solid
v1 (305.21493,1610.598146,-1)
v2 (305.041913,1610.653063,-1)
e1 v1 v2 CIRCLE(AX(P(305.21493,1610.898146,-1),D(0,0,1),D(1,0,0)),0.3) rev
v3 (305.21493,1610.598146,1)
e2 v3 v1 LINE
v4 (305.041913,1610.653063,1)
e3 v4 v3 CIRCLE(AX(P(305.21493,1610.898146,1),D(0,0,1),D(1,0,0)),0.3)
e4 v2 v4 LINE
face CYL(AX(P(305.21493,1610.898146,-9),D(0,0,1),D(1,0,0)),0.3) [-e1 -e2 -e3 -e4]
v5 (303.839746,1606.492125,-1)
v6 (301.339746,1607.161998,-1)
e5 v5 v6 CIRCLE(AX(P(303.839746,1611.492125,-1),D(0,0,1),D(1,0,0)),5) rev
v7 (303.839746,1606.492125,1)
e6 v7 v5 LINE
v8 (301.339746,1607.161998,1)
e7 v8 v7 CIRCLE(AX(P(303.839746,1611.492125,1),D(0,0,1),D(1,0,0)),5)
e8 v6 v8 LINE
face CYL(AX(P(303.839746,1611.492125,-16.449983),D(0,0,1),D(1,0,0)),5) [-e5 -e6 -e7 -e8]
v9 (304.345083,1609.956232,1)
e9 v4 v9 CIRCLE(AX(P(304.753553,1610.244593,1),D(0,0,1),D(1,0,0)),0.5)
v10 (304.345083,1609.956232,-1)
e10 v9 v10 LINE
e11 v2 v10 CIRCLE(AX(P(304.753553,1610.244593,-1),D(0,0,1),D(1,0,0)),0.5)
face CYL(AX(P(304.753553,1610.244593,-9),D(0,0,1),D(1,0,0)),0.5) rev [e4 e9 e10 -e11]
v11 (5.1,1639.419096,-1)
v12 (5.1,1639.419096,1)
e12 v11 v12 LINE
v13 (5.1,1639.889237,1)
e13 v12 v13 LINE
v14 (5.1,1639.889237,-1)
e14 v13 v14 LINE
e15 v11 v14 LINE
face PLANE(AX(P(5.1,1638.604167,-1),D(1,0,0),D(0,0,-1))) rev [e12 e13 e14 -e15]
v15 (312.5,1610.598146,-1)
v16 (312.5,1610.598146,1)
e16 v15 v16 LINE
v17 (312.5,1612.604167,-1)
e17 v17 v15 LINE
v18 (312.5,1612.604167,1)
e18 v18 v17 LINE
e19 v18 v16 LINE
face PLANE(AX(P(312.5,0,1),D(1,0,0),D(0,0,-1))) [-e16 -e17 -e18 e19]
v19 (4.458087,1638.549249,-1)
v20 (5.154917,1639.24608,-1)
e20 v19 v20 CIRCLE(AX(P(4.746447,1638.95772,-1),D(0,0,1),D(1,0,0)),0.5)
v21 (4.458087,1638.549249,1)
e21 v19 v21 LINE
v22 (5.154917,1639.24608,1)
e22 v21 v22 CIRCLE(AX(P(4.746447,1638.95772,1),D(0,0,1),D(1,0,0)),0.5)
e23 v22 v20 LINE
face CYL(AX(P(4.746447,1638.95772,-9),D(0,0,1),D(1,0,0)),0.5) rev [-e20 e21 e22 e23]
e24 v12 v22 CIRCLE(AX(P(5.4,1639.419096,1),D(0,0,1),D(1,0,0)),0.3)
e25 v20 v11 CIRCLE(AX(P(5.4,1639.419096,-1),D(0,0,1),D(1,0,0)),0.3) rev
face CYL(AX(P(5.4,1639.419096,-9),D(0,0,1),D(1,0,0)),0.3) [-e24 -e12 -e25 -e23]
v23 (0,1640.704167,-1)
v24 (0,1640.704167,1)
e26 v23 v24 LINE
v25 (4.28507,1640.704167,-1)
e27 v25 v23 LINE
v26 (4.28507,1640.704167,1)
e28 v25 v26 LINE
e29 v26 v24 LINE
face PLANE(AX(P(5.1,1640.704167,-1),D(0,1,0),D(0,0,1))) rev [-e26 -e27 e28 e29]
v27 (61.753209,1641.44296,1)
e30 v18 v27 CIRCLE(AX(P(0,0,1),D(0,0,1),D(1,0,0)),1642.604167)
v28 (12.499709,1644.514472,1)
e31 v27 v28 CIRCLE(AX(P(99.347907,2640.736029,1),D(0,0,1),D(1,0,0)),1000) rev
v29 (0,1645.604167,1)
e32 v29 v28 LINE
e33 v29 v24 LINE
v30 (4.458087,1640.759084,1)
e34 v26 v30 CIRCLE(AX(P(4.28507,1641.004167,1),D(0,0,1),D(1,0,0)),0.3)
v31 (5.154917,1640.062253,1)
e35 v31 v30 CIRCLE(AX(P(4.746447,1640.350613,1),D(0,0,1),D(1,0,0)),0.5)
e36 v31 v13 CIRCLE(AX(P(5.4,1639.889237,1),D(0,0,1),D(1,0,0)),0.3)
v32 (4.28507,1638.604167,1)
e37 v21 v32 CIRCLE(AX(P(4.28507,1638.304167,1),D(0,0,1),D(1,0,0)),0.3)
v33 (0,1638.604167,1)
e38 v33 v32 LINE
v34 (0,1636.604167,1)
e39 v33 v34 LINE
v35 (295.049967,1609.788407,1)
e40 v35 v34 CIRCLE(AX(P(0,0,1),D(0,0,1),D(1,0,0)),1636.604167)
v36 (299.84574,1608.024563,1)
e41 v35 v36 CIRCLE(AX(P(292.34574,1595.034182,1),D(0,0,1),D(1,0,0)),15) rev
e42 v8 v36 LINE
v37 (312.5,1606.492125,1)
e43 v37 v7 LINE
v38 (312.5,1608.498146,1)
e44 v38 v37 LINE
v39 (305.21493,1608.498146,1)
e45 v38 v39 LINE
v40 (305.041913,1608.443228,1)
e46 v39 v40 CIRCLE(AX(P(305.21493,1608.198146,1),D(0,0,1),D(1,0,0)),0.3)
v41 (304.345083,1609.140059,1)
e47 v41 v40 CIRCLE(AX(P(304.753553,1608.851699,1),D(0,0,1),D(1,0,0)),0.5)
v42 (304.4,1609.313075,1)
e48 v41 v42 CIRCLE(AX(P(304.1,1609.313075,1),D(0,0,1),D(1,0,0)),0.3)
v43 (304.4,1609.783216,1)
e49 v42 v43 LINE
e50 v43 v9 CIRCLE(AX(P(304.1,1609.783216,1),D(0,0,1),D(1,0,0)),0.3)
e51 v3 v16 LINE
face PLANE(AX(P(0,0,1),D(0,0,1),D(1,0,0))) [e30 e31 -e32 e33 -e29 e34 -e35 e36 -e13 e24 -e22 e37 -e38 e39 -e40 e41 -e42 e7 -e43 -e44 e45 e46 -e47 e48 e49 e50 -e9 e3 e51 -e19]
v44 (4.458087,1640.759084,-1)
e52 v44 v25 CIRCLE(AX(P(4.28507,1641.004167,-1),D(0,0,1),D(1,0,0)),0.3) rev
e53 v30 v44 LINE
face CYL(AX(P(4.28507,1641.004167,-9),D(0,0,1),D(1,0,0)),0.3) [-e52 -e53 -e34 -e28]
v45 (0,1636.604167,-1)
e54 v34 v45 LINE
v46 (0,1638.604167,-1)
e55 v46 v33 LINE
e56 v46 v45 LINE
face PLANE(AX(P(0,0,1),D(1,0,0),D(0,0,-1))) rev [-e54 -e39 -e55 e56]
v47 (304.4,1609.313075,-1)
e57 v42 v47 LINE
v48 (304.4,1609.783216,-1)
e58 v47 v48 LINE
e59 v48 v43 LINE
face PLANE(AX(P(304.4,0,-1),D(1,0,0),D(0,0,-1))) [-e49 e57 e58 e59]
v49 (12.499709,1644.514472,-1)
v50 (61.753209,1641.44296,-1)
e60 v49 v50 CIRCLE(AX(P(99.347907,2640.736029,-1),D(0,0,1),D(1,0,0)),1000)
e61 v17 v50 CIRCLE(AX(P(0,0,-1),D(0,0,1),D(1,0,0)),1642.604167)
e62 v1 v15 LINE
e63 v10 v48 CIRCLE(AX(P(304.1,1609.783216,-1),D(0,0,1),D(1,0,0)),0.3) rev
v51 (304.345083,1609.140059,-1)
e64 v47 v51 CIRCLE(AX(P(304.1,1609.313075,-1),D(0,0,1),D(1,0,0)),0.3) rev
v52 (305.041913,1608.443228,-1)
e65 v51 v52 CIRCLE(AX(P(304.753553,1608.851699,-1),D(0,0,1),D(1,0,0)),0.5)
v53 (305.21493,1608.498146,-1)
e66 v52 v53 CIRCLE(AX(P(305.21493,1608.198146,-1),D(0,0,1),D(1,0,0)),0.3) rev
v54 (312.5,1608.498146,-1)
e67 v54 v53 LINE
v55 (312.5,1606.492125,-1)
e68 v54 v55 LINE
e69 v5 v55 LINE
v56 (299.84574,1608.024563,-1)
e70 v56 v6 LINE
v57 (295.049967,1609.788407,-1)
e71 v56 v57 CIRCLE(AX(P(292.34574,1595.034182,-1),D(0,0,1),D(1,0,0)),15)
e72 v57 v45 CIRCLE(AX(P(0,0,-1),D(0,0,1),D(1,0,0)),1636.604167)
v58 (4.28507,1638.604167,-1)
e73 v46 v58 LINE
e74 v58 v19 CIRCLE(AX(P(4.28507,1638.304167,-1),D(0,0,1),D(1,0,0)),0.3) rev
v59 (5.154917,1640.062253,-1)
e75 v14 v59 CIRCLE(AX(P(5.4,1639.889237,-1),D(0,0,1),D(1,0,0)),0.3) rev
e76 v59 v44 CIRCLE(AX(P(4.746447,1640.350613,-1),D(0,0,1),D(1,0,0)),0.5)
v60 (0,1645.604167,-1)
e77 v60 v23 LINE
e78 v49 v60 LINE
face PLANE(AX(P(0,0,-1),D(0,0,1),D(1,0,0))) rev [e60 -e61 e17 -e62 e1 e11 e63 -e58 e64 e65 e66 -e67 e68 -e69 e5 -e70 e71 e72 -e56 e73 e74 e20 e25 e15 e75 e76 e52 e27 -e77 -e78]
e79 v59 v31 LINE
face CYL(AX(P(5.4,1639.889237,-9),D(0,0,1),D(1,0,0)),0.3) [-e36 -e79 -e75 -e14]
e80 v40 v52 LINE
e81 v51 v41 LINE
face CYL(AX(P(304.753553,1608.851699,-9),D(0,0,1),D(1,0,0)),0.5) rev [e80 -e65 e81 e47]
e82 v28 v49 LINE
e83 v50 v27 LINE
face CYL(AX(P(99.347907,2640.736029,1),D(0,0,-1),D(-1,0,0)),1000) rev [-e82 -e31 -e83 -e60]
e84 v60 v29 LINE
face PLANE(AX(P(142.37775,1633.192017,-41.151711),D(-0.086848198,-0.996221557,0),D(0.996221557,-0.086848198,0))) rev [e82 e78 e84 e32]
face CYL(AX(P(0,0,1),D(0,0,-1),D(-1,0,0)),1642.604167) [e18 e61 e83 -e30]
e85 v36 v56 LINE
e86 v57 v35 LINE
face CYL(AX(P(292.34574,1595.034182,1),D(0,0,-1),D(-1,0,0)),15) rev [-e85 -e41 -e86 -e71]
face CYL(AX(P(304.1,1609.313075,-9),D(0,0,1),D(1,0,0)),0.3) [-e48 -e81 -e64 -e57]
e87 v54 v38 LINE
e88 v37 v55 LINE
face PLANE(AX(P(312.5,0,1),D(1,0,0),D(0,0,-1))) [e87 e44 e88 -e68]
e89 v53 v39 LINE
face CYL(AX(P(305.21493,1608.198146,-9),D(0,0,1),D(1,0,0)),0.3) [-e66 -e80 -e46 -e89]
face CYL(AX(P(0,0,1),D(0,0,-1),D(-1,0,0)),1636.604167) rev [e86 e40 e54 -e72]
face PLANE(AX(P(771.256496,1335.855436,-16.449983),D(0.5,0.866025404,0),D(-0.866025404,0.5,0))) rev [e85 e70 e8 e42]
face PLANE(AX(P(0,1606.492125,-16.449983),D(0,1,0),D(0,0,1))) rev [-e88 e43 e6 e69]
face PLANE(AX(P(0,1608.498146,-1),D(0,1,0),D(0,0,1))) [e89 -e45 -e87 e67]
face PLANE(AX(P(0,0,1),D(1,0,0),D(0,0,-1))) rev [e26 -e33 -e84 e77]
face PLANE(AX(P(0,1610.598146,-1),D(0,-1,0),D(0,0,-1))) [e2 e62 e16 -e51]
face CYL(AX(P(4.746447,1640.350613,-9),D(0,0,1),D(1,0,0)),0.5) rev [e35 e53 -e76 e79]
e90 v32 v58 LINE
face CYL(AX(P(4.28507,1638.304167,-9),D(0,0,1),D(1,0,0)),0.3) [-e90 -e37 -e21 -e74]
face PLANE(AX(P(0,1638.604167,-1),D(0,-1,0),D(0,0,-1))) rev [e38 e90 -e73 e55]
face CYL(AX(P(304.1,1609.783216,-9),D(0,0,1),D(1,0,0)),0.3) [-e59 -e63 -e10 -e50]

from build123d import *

# Parameters (mm, degrees)
EXTRUDE_1_DEPTH     = 1
EXTRUDE_2_DEPTH     = 2
SKETCH_2_3_W        = 8.1
SKETCH_2_3_H        = 1.05
CUT_EXTRUDE_1_DEPTH = 1673.067193133
EXTRUDE_3_DEPTH     = 2
FILLET_1_R          = 1000
SKETCH_4_W          = 5.1
SKETCH_4_H          = 2.1
CUT_EXTRUDE_2_DEPTH = 1676.014424819
CUT_EXTRUDE_3_DEPTH = 10
FILLET_2_R          = 0.3
FILLET_3_R          = 15
FILLET_4_R          = 5


with BuildPart() as part:
    # 草图1 → 凸台-拉伸1 (new, symmetric)
    with BuildSketch(Plane.XY):
        with BuildLine():
            Line((279.250783347, 1612.604166667), (312.5, 1612.604166667))
            ThreePointArc((312.5, 1612.604166667), (156.96834872, 1635.086965837), (0, 1642.604166667))
            Line((0, 1642.604166667), (0, 1636.604166667))
            ThreePointArc((0, 1636.604166667), (140.140108463, 1630.593127776), (279.250783347, 1612.604166667))
        make_face()
        with BuildLine():
            ThreePointArc((279.250783347, 1612.604166667), (295.891173678, 1609.633999296), (312.5, 1606.492125207))
            Line((312.5, 1606.492125207), (312.5, 1612.604166667))
            Line((312.5, 1612.604166667), (279.250783347, 1612.604166667))
        make_face()
    extrude(amount=EXTRUDE_1_DEPTH, both=True)

    # 草图2 → 凸台-拉伸2 (add)
    with BuildSketch(Plane.XY.offset(1)):
        with BuildLine():
            Line((304.4, 1608.498145937), (304.4, 1609.548145937))
            Line((304.4, 1609.548145937), (304.4, 1610.598145937))
            Line((304.4, 1610.598145937), (297.605619779, 1609.317896945))
            ThreePointArc((297.605619779, 1609.317896945), (305.056081841, 1607.922257226), (312.5, 1606.492125207))
            Line((312.5, 1606.492125207), (312.5, 1608.498145937))
            Line((312.5, 1608.498145937), (304.4, 1608.498145937))
        make_face()
        with BuildLine():
            Line((302.5, 1606.492125207), (312.5, 1606.492125207))
            ThreePointArc((312.5, 1606.492125207), (305.056081841, 1607.922257226), (297.605619779, 1609.317896945))
            Line((297.605619779, 1609.317896945), (302.5, 1606.492125207))
        make_face()
    extrude(amount=-EXTRUDE_2_DEPTH)

    # 草图2<3> → 切除-拉伸1 (cut, through all)
    with BuildSketch(Plane.XY.offset(1)):
        with Locations((308.45, 1610.073145937)):
            Rectangle(SKETCH_2_3_W, SKETCH_2_3_H)
        with Locations((308.45, 1609.023145937)):
            Rectangle(SKETCH_2_3_W, SKETCH_2_3_H)
    extrude(amount=-CUT_EXTRUDE_1_DEPTH, mode=Mode.SUBTRACT)

    # 草图3 → 凸台-拉伸3 (add)
    with BuildSketch(Plane.XY.offset(1)):
        with BuildLine():
            Line((0, 1645.604166667), (0, 1642.604166667))
            ThreePointArc((0, 1642.604166667), (20.001482883, 1642.482386217), (40, 1642.117062925))
            Line((40, 1642.117062925), (0, 1645.604166667))
        make_face()
    extrude(amount=-EXTRUDE_3_DEPTH)

    # 圆角1
    # the kernel refuses this fillet: 1000 mm, written as the material it adds along each edge
    with BuildSketch(Plane(origin=(40, 1642.117062925, 1), x_dir=(-0.9962215569396788, 0.08684819795874989, 0), z_dir=(0, 0, -1))) as fillet_1_piece_1:
        with BuildLine():
            CenterArc((27.604593051, 1000), FILLET_1_R, 267.172213378, 2.827786622)
            ThreePointArc((-21.729560043, 1.217670692), (-10.862763311, 0.644823912), (0, 0))
            Line((0, 0), (27.604593051, 0))
        make_face()
    extrude(amount=2)

    # 草图4 → 切除-拉伸2 (cut, through all)
    with BuildSketch(Plane.XY.offset(1)):
        with Locations((2.55, 1639.654166667)):
            Rectangle(SKETCH_4_W, SKETCH_4_H)
    extrude(amount=-CUT_EXTRUDE_2_DEPTH, mode=Mode.SUBTRACT)

    # 草图5 → 切除-拉伸3 (cut)
    with BuildSketch(Plane.XY.offset(1)):
        with BuildLine():
            Line((304.4, 1608.498145937), (304.4, 1609.205252718))
            ThreePointArc((304.4, 1609.205252718), (304.253553391, 1608.851699327), (304.4, 1608.498145937))
        make_face()
        with BuildLine():
            Line((305.107106781, 1608.498145937), (304.4, 1608.498145937))
            ThreePointArc((304.4, 1608.498145937), (304.753553391, 1608.351699327), (305.107106781, 1608.498145937))
        make_face()
        with BuildLine():
            ThreePointArc((304.4, 1610.598145937), (304.253553391, 1610.244592546), (304.4, 1609.891039155))
            Line((304.4, 1609.891039155), (304.4, 1610.598145937))
        make_face()
        with BuildLine():
            Line((304.4, 1610.598145937), (305.107106781, 1610.598145937))
            ThreePointArc((305.107106781, 1610.598145937), (304.753553391, 1610.744592546), (304.4, 1610.598145937))
        make_face()
        with BuildLine():
            ThreePointArc((5.1, 1639.997059885), (5.208386376, 1640.15927156), (5.246446609, 1640.350613276))
            ThreePointArc((5.246446609, 1640.350613276), (5.208386376, 1640.541954992), (5.1, 1640.704166667))
            Line((5.1, 1640.704166667), (5.1, 1639.997059885))
        make_face()
        with BuildLine():
            Line((4.392893219, 1640.704166667), (5.1, 1640.704166667))
            ThreePointArc((5.1, 1640.704166667), (4.746446609, 1640.850613276), (4.392893219, 1640.704166667))
        make_face()
        with BuildLine():
            ThreePointArc((5.246446609, 1638.957720057), (5.208386376, 1639.149061773), (5.1, 1639.311273448))
            Line((5.1, 1639.311273448), (5.1, 1638.604166667))
            ThreePointArc((5.1, 1638.604166667), (5.208386376, 1638.766378341), (5.246446609, 1638.957720057))
        make_face()
        with BuildLine():
            Line((5.1, 1638.604166667), (4.392893219, 1638.604166667))
            ThreePointArc((4.392893219, 1638.604166667), (4.746446609, 1638.457720057), (5.1, 1638.604166667))
        make_face()
    extrude(amount=-CUT_EXTRUDE_3_DEPTH, mode=Mode.SUBTRACT)

    # 圆角2
    fillet_2_edges = [part.edges().sort_by_distance(p)[0] for p in [
        (4.392893219, 1638.604166667, 0),
        (5.1, 1639.997059885, 0),
        (304.4, 1609.205252718, 0),
        (305.107106781, 1610.598145937, 0),
        (305.107106781, 1608.498145937, 0),
        (304.4, 1609.891039155, 0),
        (4.392893219, 1640.704166667, 0),
        (5.1, 1639.311273448, 0),
    ]]
    fillet(fillet_2_edges, radius=FILLET_2_R)

    # 圆角3
    fillet_3_edges = [part.edges().sort_by_distance(p)[0] for p in [
        (297.605619779, 1609.317896945, 0),
    ]]
    fillet(fillet_3_edges, radius=FILLET_3_R)

    # 圆角4
    fillet_4_edges = [part.edges().sort_by_distance(p)[0] for p in [
        (302.5, 1606.492125207, 0),
    ]]
    fillet(fillet_4_edges, radius=FILLET_4_R)


solid = part.part
